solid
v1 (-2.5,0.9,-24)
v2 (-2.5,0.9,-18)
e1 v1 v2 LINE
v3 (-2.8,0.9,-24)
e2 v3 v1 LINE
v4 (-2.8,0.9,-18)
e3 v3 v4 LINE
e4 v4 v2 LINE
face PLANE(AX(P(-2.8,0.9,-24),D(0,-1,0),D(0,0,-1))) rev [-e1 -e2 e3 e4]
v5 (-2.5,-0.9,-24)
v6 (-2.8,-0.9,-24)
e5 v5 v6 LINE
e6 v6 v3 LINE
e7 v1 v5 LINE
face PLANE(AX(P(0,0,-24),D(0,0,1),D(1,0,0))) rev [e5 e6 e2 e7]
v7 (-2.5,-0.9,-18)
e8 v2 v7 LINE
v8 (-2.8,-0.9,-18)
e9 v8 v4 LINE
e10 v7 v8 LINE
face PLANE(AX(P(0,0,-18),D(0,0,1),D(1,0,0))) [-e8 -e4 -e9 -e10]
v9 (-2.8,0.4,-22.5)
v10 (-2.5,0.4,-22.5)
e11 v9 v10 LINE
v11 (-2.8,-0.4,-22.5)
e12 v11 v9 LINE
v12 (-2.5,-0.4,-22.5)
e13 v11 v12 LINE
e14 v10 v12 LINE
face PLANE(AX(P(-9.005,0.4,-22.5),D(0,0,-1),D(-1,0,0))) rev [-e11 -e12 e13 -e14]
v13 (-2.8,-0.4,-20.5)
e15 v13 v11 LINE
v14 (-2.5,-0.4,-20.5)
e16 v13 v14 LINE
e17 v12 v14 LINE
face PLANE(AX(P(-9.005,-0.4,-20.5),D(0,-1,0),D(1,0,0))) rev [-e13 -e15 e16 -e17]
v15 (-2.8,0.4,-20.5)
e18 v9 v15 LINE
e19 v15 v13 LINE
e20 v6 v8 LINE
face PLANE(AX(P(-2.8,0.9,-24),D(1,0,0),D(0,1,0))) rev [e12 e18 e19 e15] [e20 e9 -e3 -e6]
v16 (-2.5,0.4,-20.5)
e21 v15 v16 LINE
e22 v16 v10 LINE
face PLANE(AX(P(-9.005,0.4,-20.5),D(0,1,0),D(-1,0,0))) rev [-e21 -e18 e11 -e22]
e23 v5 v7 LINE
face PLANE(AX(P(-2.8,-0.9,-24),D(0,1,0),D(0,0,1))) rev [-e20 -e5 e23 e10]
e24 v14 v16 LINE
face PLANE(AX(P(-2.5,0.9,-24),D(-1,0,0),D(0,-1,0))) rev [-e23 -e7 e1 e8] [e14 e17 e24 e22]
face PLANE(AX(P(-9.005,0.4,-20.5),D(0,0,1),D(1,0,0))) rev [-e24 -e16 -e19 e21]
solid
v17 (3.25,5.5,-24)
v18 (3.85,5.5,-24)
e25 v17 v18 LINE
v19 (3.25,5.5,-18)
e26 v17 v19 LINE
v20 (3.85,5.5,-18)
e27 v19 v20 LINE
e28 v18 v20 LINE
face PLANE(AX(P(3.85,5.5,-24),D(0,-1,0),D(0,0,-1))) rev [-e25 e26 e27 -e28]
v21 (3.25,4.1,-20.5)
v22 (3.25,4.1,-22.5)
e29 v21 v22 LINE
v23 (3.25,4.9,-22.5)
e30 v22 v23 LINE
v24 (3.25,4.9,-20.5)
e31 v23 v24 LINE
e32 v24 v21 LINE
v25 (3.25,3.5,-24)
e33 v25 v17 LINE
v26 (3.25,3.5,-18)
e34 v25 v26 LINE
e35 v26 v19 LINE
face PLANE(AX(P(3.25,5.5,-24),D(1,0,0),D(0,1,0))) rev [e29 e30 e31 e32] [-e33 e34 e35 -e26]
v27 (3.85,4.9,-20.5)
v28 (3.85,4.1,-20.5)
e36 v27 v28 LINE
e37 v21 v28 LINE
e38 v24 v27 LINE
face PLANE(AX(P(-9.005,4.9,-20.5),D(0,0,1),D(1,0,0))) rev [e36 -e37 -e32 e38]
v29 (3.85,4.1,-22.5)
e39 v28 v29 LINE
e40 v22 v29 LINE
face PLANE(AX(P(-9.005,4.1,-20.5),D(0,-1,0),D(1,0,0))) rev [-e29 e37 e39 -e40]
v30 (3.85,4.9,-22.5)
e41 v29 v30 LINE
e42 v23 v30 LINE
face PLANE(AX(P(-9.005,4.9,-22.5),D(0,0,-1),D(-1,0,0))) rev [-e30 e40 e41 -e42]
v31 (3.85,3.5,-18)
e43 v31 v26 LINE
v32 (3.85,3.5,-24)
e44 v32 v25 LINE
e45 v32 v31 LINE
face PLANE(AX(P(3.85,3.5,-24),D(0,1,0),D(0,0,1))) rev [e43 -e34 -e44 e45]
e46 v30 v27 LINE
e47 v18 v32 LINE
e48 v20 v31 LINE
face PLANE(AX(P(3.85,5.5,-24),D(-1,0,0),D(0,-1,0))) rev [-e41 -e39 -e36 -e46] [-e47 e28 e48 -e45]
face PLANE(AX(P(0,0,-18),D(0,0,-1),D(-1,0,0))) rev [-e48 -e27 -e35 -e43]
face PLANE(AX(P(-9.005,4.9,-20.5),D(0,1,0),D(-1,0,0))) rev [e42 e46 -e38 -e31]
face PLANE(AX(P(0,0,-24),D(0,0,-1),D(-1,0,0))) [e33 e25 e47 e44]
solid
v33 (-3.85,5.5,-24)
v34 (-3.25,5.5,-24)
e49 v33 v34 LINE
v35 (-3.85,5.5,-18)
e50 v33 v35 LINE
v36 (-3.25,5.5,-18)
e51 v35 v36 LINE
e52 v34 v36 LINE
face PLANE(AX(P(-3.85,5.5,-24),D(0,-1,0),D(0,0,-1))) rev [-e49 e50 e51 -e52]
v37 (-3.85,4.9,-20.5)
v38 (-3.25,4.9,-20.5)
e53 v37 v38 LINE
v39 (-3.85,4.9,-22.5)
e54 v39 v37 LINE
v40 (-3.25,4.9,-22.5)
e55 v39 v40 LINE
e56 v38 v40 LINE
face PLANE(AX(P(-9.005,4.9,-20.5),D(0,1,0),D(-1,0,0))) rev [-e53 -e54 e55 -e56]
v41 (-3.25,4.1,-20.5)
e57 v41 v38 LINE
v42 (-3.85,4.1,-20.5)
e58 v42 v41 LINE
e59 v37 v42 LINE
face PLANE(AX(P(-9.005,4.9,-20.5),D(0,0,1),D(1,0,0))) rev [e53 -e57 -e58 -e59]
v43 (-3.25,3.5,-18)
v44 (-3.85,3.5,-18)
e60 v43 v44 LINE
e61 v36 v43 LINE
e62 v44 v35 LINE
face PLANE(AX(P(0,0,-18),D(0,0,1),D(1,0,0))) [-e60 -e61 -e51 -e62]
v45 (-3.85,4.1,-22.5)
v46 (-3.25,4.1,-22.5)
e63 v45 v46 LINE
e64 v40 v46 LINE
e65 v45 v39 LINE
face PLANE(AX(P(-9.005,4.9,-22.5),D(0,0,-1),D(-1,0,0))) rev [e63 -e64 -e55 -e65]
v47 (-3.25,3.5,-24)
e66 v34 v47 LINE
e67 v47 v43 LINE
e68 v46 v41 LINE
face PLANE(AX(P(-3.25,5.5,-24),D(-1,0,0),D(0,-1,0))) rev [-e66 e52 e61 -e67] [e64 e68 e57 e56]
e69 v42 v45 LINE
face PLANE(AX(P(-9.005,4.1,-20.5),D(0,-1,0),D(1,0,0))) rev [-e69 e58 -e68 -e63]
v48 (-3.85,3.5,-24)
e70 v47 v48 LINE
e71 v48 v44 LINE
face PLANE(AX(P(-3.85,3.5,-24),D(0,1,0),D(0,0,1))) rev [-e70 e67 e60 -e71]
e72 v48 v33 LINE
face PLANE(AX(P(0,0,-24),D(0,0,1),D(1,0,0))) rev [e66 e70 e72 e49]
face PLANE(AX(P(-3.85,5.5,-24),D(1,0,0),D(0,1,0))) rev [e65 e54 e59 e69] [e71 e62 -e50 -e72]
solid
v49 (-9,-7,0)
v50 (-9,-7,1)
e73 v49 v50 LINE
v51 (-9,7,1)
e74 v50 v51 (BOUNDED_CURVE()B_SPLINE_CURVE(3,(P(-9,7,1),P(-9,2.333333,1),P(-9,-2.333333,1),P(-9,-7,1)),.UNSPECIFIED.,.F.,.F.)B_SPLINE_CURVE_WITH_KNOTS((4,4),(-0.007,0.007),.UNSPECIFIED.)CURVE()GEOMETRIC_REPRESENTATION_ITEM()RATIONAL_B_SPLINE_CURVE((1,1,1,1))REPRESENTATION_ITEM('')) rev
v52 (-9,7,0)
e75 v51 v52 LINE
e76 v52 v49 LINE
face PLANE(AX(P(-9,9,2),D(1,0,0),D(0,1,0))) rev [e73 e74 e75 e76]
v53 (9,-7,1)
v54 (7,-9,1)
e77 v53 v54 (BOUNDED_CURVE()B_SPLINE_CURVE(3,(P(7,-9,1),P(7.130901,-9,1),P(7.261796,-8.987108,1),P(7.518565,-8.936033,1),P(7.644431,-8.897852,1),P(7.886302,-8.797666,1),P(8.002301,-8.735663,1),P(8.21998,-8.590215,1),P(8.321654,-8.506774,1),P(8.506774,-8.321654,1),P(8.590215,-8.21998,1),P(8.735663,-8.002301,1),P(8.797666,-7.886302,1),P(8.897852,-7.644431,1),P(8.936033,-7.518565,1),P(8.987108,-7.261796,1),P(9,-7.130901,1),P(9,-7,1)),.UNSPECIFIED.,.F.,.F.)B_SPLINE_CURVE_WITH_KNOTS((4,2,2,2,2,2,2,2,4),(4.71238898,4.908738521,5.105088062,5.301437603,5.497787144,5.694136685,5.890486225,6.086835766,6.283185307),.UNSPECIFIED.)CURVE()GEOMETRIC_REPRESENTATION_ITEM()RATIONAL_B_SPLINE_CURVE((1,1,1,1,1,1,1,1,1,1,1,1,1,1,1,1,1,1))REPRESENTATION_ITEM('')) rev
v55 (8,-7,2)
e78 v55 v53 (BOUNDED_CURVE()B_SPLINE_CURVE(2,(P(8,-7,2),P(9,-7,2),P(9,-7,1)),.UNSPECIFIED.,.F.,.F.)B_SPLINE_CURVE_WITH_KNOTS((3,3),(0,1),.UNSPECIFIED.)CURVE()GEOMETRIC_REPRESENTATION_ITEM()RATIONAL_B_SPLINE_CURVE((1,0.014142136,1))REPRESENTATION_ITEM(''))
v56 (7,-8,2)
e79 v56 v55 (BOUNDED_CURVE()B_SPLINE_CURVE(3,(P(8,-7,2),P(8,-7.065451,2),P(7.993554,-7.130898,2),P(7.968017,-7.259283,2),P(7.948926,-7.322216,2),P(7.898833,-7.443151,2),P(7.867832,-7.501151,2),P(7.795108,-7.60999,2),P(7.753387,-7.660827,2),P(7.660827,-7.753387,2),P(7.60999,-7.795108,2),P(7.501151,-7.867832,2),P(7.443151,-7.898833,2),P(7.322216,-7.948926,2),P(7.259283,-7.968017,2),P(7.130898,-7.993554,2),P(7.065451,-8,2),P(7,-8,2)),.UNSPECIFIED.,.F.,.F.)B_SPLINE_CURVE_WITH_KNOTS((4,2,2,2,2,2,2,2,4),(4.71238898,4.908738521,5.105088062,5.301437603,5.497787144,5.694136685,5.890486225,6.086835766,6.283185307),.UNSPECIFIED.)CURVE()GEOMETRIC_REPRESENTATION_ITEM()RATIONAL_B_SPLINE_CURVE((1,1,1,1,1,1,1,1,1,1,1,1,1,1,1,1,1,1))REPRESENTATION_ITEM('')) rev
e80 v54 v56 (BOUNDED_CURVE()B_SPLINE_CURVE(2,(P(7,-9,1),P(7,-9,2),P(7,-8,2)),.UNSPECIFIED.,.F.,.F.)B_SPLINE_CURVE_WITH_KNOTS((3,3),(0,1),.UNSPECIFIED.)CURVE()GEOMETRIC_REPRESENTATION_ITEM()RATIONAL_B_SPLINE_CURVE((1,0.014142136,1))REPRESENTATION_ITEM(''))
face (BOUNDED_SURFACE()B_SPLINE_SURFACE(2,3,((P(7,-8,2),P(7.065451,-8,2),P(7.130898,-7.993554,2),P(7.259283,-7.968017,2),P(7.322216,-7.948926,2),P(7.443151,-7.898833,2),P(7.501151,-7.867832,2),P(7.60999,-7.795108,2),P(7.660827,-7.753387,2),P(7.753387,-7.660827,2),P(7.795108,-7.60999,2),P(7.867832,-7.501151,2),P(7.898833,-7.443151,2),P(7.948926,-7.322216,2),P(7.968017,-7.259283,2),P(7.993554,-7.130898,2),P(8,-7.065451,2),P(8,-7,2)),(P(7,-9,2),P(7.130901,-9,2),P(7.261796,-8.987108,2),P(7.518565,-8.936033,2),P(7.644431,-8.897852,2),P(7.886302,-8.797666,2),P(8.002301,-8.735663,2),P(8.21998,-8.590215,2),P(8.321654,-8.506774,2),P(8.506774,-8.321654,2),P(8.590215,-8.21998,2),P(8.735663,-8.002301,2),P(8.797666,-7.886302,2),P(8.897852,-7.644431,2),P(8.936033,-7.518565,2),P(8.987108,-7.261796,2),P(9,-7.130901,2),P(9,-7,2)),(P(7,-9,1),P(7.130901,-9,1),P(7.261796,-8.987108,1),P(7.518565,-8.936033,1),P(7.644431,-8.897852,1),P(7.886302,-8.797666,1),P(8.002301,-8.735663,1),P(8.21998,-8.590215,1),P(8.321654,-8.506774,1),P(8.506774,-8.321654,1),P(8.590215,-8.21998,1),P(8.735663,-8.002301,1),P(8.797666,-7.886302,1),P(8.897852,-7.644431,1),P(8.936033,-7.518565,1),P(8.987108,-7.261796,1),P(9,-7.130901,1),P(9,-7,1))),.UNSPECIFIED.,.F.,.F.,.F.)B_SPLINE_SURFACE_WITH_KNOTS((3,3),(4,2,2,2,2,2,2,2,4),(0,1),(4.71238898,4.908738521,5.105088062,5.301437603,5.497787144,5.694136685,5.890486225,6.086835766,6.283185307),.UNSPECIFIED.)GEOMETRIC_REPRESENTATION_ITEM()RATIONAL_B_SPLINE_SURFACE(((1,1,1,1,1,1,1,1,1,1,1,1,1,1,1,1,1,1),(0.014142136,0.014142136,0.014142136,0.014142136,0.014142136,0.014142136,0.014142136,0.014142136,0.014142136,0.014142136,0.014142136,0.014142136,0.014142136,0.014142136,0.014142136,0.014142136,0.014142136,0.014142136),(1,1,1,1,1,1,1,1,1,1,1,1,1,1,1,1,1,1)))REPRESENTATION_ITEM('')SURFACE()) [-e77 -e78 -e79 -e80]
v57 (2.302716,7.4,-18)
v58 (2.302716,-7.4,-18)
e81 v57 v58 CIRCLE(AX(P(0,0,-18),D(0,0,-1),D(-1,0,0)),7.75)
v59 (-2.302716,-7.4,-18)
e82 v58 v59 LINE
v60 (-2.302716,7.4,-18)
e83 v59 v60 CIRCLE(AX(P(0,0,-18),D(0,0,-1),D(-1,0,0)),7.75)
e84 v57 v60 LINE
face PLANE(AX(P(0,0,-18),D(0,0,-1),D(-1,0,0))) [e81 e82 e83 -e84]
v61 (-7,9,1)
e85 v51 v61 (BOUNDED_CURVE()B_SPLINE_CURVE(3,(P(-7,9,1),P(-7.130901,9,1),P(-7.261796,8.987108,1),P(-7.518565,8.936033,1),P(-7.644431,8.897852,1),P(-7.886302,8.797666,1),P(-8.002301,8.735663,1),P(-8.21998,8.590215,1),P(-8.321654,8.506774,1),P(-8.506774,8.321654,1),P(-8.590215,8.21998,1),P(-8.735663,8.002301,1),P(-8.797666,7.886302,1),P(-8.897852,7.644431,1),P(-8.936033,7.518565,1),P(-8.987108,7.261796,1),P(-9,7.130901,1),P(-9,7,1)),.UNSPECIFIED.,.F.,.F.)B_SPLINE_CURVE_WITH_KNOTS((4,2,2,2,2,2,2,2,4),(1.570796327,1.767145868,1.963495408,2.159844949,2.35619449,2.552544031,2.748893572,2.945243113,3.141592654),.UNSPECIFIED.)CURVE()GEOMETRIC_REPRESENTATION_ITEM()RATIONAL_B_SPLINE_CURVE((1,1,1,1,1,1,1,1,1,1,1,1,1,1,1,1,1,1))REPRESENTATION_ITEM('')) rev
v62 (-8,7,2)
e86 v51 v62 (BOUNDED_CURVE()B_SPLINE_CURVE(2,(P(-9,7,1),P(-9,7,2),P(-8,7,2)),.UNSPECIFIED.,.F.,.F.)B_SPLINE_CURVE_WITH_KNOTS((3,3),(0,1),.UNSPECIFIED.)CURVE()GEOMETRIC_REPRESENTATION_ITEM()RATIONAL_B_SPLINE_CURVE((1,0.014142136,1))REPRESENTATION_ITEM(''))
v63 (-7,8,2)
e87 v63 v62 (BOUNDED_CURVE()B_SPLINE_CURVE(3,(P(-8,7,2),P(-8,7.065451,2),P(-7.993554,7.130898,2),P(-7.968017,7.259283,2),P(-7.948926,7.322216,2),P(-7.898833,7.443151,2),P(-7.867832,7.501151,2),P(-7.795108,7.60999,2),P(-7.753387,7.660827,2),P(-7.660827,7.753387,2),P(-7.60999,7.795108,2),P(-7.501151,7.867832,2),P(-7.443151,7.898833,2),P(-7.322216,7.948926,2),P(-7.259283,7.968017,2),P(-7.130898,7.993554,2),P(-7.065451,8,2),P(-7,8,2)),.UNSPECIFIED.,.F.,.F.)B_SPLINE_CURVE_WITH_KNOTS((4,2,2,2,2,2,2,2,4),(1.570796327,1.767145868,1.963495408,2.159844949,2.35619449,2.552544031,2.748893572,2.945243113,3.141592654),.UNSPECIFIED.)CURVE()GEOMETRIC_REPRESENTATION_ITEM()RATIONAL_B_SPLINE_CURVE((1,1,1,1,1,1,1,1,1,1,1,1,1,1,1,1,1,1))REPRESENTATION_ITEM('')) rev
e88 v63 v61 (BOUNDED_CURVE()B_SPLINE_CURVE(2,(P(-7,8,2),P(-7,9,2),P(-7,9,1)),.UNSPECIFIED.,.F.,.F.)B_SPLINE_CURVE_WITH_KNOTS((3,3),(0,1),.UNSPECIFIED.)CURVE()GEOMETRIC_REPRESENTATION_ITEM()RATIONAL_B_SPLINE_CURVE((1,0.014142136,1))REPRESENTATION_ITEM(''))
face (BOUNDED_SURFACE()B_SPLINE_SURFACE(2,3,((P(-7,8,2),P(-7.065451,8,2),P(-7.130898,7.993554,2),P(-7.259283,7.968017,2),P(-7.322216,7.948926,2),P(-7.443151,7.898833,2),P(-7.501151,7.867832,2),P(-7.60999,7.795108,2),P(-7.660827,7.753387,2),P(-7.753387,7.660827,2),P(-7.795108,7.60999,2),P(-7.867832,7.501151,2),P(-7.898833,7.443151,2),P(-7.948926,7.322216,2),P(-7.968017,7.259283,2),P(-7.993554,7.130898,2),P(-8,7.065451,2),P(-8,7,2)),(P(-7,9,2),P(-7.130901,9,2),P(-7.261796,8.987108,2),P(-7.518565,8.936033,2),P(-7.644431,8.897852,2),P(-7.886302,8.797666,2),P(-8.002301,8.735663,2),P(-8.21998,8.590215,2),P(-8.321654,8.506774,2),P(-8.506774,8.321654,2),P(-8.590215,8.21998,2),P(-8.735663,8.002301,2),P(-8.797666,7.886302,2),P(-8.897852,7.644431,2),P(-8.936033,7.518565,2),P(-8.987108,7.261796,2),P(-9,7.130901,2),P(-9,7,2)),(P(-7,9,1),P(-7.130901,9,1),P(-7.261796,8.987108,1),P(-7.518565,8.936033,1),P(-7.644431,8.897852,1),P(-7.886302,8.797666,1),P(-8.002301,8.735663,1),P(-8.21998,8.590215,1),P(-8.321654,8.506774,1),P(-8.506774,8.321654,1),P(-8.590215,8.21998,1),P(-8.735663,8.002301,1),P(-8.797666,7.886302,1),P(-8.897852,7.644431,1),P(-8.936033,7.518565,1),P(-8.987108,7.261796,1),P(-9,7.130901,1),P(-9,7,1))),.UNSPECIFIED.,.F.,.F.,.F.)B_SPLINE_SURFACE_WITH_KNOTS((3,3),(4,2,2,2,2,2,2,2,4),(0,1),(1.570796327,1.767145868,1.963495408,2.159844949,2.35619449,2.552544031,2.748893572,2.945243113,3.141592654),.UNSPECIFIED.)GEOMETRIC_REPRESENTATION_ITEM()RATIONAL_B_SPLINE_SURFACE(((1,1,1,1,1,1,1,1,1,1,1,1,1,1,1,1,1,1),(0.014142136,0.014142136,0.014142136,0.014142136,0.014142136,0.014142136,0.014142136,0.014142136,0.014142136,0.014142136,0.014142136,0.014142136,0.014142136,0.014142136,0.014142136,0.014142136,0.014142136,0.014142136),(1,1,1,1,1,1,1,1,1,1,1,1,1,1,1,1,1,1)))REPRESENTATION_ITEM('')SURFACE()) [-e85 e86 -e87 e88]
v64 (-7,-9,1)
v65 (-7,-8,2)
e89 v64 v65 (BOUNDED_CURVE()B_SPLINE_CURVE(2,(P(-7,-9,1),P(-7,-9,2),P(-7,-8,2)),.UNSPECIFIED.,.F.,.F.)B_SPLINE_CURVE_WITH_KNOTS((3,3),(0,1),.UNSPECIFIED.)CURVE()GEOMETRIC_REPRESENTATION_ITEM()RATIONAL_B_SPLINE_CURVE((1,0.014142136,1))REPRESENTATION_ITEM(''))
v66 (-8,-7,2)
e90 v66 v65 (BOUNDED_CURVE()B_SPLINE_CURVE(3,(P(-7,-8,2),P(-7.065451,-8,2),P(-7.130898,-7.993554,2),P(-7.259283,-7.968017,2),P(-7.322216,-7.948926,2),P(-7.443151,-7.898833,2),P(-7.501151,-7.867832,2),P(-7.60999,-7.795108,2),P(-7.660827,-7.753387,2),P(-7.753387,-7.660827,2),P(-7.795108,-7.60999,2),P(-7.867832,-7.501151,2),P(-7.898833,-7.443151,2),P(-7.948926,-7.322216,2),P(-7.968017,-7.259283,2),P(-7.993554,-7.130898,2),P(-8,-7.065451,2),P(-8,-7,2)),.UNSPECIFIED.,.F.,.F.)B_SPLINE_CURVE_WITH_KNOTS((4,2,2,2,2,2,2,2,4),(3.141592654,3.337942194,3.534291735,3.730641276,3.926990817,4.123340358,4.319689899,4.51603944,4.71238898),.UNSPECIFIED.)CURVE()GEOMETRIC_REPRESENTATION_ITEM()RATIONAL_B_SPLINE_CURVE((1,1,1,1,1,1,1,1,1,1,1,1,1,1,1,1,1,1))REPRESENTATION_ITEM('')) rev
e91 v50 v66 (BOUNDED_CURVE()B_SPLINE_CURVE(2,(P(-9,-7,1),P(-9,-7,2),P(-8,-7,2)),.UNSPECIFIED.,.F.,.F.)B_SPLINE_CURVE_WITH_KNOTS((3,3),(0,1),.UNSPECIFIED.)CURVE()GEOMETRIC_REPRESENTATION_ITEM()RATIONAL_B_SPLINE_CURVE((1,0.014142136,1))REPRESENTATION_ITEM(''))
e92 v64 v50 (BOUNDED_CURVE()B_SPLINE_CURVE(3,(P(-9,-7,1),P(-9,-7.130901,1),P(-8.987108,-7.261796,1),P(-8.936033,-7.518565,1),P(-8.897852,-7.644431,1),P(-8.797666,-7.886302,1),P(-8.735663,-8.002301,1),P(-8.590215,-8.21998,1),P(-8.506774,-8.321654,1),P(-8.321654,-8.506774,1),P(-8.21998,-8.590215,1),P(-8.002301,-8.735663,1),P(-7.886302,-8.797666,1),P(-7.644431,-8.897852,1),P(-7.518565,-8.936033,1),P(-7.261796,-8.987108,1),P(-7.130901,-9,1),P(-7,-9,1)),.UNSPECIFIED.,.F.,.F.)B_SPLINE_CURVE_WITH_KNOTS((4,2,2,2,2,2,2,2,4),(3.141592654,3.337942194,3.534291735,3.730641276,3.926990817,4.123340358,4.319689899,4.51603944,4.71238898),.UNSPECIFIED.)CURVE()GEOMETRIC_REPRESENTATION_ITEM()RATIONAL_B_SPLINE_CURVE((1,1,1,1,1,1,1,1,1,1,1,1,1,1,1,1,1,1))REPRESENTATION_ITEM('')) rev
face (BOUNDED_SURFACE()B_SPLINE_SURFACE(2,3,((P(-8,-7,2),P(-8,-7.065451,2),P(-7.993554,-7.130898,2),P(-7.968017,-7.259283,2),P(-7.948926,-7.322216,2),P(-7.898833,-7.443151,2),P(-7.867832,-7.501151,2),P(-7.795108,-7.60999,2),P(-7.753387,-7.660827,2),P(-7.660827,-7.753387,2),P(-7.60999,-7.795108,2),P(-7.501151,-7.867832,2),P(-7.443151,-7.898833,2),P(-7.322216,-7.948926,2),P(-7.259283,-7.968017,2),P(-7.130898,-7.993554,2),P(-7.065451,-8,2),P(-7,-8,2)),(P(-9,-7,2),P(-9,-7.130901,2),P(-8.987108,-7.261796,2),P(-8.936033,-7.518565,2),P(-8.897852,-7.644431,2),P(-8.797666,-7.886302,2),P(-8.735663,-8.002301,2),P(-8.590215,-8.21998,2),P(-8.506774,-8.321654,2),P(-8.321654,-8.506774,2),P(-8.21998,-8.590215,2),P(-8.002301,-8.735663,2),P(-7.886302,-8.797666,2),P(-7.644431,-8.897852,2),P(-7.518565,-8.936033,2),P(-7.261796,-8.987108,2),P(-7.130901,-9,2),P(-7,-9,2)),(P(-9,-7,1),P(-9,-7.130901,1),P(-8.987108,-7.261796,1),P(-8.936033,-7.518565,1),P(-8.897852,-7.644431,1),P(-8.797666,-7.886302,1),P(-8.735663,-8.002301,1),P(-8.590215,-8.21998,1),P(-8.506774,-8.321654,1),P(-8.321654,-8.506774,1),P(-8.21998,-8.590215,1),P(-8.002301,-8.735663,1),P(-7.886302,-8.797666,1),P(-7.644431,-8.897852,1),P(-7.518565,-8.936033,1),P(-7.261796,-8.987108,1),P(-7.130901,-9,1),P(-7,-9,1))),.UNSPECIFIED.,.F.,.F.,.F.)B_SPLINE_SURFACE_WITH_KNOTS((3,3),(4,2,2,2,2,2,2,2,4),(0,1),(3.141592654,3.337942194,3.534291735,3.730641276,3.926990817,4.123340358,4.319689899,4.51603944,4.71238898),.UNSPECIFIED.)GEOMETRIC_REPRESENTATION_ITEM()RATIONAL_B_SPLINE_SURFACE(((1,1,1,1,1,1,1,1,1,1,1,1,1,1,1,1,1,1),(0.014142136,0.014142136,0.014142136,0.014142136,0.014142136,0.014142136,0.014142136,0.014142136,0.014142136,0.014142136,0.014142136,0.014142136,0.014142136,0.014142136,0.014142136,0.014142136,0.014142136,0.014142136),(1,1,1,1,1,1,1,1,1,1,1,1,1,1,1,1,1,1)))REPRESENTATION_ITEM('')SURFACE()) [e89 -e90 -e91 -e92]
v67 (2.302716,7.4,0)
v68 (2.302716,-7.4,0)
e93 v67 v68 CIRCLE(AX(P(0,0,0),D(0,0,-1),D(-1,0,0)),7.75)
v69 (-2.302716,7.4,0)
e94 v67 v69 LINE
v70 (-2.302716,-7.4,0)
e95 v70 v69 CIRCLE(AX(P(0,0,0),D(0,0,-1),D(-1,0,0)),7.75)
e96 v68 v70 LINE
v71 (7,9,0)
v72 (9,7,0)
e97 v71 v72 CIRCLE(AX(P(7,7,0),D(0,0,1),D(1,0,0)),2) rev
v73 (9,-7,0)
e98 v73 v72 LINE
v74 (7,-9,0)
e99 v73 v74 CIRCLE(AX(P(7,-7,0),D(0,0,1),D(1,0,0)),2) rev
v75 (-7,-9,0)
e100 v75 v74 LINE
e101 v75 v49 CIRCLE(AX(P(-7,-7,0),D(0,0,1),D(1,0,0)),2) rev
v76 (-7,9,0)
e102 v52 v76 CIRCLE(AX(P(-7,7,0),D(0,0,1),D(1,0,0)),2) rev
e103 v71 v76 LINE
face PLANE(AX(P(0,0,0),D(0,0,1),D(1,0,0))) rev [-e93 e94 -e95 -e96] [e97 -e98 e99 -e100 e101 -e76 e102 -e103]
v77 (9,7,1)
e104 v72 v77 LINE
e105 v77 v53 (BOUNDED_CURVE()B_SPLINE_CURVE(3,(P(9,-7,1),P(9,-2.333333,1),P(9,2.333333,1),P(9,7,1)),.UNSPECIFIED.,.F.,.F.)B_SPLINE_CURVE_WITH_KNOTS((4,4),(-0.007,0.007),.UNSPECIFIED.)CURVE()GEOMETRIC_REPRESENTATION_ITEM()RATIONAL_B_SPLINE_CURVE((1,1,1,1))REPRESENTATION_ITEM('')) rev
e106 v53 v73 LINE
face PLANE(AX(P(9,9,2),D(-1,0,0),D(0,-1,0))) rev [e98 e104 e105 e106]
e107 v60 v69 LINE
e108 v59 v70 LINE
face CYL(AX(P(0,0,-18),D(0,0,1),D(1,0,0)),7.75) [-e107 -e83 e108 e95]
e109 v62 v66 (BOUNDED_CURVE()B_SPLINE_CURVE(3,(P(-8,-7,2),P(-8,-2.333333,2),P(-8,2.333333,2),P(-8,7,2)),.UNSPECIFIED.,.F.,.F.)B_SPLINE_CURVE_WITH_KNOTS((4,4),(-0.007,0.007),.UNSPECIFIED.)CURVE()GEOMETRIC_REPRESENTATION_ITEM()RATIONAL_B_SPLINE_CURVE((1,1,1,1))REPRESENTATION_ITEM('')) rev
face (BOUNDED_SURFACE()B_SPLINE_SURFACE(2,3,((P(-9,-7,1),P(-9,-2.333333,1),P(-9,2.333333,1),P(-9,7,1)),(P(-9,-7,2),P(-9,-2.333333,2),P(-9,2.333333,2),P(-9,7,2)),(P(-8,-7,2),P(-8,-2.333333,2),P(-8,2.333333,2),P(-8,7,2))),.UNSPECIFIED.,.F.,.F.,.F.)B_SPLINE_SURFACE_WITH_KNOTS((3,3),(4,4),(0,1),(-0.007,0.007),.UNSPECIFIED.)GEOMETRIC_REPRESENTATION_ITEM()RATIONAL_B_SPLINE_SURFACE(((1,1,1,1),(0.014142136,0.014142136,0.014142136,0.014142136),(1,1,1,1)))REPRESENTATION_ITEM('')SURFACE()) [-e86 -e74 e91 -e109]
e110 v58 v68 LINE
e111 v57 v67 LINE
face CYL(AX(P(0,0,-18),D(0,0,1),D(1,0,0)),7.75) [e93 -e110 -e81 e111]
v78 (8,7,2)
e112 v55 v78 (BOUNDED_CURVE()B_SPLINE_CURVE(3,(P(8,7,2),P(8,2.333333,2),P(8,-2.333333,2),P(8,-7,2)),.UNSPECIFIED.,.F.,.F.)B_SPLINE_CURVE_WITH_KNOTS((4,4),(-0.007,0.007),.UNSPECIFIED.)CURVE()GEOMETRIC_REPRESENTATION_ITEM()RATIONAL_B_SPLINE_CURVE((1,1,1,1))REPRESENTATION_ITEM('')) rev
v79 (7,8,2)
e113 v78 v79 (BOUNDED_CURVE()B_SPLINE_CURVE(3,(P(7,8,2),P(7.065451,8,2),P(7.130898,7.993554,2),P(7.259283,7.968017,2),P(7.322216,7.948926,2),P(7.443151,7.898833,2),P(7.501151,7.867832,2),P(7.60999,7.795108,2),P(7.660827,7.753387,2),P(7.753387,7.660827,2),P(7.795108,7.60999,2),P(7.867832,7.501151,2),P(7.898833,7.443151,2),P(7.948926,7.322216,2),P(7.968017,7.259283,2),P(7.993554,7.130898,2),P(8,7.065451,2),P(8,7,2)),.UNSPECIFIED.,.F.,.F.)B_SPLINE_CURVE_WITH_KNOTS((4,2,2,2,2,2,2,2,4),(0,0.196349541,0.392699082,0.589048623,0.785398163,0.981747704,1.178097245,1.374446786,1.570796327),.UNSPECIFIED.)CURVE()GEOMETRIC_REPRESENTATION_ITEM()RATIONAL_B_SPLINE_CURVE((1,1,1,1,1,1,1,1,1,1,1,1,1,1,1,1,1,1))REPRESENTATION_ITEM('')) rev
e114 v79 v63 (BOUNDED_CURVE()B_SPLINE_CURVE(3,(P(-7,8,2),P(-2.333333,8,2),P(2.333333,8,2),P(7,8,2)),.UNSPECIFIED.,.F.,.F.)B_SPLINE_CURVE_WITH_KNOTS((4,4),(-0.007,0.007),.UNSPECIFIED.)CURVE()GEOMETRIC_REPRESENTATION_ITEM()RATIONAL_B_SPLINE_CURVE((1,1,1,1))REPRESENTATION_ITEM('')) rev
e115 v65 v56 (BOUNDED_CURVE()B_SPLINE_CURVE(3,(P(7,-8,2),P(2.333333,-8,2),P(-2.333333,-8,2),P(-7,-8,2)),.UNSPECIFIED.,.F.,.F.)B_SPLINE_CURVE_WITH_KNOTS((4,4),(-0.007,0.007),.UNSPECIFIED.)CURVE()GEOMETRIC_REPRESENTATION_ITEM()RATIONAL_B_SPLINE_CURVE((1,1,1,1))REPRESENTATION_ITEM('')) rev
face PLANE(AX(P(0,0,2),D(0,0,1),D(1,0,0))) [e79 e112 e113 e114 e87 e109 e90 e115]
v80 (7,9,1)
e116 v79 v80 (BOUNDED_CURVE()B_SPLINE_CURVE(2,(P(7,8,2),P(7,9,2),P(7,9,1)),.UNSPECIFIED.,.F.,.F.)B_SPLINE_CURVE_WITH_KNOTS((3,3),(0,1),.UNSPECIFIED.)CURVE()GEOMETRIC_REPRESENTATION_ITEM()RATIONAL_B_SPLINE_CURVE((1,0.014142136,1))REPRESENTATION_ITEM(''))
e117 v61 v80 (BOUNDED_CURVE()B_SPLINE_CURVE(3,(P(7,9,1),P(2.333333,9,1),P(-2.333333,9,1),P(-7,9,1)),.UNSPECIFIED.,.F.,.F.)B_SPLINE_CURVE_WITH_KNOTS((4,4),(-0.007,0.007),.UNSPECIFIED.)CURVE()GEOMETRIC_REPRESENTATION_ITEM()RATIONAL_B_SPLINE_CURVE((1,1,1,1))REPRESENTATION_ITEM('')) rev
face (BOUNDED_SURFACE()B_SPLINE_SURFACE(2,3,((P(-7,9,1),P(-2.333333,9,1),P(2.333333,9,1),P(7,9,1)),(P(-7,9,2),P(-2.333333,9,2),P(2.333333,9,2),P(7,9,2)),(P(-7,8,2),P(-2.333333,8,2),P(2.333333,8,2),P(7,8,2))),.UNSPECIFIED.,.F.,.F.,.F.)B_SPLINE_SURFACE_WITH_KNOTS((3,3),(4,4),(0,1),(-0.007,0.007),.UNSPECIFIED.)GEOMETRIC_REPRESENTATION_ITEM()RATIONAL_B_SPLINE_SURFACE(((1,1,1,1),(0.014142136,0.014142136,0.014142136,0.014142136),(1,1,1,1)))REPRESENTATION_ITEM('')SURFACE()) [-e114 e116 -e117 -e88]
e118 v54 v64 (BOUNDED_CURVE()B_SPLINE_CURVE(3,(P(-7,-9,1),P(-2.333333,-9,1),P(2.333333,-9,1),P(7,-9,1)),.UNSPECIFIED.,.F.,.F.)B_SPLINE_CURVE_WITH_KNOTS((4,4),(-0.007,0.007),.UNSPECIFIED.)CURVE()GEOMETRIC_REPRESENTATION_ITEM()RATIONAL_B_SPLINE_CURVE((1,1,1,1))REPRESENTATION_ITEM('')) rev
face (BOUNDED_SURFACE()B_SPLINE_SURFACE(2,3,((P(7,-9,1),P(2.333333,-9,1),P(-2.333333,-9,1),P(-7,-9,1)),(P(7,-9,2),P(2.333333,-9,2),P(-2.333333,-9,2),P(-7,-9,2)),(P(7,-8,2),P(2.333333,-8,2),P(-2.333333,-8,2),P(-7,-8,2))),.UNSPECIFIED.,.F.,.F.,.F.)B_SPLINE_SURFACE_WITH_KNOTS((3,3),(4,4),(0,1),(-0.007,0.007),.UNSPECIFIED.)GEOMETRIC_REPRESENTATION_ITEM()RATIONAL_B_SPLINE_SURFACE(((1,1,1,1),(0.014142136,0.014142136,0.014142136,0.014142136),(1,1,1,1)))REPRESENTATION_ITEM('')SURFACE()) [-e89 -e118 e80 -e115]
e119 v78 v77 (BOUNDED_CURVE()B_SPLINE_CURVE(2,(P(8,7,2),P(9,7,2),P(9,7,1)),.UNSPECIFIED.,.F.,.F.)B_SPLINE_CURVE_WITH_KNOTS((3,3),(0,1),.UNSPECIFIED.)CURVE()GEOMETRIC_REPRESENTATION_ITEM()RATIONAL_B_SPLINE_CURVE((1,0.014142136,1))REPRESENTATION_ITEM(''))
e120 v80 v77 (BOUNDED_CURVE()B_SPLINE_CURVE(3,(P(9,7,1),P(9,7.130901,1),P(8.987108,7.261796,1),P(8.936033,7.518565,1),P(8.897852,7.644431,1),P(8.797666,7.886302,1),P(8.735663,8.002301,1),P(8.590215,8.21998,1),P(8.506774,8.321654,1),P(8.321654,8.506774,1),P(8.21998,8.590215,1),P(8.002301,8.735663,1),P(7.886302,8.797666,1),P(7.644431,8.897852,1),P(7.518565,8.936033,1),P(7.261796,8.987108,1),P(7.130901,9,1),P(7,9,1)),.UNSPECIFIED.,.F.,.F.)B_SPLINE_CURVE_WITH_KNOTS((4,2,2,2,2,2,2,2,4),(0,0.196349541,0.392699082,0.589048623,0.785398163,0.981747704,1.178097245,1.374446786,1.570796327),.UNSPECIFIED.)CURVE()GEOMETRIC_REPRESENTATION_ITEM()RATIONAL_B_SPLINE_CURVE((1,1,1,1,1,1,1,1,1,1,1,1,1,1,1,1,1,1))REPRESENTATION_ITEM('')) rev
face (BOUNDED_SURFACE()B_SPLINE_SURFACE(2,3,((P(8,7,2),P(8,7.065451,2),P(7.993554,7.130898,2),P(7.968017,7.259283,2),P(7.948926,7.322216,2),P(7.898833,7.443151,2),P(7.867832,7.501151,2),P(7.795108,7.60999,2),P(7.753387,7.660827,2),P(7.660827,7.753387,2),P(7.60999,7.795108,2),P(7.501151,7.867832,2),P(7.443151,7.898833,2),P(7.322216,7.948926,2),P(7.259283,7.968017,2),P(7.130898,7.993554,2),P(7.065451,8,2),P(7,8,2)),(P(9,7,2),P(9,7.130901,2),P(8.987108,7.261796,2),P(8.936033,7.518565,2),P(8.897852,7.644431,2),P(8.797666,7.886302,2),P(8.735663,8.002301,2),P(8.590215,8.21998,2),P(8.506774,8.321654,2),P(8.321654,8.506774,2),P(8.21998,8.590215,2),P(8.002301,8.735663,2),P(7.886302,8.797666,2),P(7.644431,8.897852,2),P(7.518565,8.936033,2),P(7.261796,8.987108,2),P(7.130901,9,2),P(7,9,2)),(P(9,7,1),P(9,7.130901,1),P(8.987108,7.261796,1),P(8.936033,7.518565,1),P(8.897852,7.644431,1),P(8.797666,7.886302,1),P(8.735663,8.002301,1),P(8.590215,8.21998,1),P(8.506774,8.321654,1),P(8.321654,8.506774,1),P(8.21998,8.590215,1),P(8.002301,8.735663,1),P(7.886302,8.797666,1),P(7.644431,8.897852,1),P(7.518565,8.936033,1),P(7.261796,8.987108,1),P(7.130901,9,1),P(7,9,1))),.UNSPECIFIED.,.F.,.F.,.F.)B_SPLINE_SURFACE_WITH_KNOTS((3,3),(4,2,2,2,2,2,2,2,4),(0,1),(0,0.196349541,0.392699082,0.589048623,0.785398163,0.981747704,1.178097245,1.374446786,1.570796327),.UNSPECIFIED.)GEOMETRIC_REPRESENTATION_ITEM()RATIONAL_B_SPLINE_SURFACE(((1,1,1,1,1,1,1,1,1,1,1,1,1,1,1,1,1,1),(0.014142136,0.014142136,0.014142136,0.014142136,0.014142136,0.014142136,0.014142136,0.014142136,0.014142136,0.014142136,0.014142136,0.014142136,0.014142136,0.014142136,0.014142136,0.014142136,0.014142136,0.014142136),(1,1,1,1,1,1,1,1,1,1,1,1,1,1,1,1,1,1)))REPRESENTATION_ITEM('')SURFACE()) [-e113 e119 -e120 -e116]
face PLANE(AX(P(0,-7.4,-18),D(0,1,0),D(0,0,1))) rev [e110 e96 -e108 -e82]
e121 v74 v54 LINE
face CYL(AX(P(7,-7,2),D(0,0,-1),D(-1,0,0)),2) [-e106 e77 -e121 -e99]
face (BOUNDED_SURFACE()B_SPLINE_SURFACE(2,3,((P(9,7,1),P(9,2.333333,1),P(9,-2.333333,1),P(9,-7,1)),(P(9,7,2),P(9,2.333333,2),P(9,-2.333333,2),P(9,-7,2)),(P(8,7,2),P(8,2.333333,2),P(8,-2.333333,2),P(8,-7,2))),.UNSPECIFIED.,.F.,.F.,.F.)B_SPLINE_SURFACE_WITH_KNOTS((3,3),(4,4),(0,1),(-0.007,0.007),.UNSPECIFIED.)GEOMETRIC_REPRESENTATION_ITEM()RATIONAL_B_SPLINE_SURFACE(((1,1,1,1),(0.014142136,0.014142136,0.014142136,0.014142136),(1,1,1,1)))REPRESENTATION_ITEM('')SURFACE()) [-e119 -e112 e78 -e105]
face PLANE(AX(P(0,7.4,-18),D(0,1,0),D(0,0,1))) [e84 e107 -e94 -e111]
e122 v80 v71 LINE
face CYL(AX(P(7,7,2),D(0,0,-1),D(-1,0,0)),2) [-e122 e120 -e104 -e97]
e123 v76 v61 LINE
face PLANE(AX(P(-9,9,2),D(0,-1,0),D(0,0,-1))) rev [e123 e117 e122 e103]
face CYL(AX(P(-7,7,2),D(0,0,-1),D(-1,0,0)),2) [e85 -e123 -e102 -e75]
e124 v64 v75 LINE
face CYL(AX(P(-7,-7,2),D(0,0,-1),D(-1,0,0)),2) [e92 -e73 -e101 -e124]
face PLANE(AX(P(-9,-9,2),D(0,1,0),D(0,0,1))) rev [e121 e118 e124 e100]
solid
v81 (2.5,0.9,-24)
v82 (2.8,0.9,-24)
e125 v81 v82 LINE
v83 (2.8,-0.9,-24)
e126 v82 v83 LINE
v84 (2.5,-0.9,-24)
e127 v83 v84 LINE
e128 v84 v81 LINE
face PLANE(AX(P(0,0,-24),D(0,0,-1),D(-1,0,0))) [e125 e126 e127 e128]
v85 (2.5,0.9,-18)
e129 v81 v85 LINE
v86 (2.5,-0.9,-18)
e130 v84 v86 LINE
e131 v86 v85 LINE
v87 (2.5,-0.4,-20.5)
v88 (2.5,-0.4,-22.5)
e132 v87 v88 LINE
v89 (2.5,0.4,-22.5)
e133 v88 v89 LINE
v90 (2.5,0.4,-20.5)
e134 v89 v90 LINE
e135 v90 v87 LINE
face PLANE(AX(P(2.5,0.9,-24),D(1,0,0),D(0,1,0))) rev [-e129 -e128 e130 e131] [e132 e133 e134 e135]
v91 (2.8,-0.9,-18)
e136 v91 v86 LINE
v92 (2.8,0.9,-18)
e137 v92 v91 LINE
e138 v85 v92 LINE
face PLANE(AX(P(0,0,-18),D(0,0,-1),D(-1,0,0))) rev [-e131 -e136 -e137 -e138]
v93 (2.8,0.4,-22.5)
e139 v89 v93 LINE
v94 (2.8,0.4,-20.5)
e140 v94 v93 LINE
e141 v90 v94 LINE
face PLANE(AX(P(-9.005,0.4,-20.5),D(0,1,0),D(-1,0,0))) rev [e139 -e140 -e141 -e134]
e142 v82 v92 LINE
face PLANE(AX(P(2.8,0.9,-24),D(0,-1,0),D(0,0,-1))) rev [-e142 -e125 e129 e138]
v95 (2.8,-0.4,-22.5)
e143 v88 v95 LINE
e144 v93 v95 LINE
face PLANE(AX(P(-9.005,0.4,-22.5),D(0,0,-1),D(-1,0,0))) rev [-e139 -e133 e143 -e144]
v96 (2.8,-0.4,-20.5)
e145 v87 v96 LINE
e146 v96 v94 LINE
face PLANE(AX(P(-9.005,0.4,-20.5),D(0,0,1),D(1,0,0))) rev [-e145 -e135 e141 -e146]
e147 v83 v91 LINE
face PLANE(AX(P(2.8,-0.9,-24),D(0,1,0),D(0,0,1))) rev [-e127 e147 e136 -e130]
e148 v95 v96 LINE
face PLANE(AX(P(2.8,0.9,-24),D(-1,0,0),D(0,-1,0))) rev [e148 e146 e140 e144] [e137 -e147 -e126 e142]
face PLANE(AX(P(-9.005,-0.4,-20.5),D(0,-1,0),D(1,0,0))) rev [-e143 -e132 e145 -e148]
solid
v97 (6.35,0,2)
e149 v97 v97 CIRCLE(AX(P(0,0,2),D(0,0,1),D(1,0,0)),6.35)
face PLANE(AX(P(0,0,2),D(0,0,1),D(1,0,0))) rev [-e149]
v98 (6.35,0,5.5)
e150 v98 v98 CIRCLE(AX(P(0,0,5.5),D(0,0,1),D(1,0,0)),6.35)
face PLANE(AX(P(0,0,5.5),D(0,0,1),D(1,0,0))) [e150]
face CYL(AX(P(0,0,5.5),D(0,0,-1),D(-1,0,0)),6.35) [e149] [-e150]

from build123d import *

# Parameters (mm, degrees)
SKETCH1_W             = 18
SKETCH1_H             = 18
BOSS_EXTRUDE1_DEPTH   = 2
FILLET1_R             = 2
FILLET2_SIZE          = 1
SKETCH2_R             = 6.35
BOSS_EXTRUDE2_DEPTH   = 3.5
BOSS_EXTRUDE3_DEPTH   = 18
SKETCH4_W             = 0.6
SKETCH4_H             = 2
BOSS_EXTRUDE4_DEPTH   = 6
SKETCH4_W_2           = 0.3
SKETCH4_H_2           = 1.8
BOSS_EXTRUDE4_2_DEPTH = 6
BOSS_EXTRUDE4_3_DEPTH = 6
BOSS_EXTRUDE4_4_DEPTH = 6
SKETCH5_W             = 2
SKETCH5_H             = 0.8
CUT_EXTRUDE1_DEPTH    = 29.672678709


with BuildPart() as part:
    # Sketch1 → Boss-Extrude1 (new body)
    with BuildSketch(Plane.XY):
        Rectangle(SKETCH1_W, SKETCH1_H)
    extrude(amount=BOSS_EXTRUDE1_DEPTH)

    # Fillet1
    fillet1_edges = [part.edges().sort_by_distance(p)[0] for p in [
        (9, -9, 1),
        (-9, -9, 1),
        (-9, 9, 1),
        (9, 9, 1),
    ]]
    fillet(fillet1_edges, radius=FILLET1_R)

    # Fillet2
    # a fillet whose section is not a circle: 1 mm, written as the material it takes off along each edge
    with BuildSketch(Plane(origin=(-7, 7, 2), x_dir=(0, 1, 0), z_dir=(1, 0, 0))) as fillet2_piece_1:
        with BuildLine():
            Bezier((2, -FILLET2_SIZE), (2, 0), (2 - FILLET2_SIZE, 0), weights=[1, 0.014142136, 1])
            Line((2 - FILLET2_SIZE, 0), (2, 0))
            Line((2, 0), (2, -FILLET2_SIZE))
        make_face()
    revolve(axis=Axis((-7, 7, 2), (0, 0, 1)), revolution_arc=90, mode=Mode.SUBTRACT)
    with BuildSketch(Plane(origin=(-7, 9, 2), x_dir=(0, 0, -1), z_dir=(1, 0, 0))) as fillet2_piece_2:
        with BuildLine():
            Bezier((FILLET2_SIZE, 0), (0, 0), (0, -FILLET2_SIZE), weights=[1, 0.014142136, 1])
            Line((0, -FILLET2_SIZE), (0, 0))
            Line((0, 0), (FILLET2_SIZE, 0))
        make_face()
    extrude(amount=14, mode=Mode.SUBTRACT)
    with BuildSketch(Plane(origin=(7, 7, 2), x_dir=(0, 1, 0), z_dir=(-1, 0, 0))) as fillet2_piece_3:
        with BuildLine():
            Bezier((2, FILLET2_SIZE), (2, 0), (2 - FILLET2_SIZE, 0), weights=[1, 0.014142136, 1])
            Line((2 - FILLET2_SIZE, 0), (2, 0))
            Line((2, 0), (2, FILLET2_SIZE))
        make_face()
    revolve(axis=Axis((7, 7, 2), (0, 0, -1)), revolution_arc=90, mode=Mode.SUBTRACT)
    with BuildSketch(Plane(origin=(9, 7, 2), x_dir=(-1, 0, 0), z_dir=(0, -1, 0)), Plane(origin=(7, -9, 2), x_dir=(0, 1, 0), z_dir=(-1, 0, 0)), Plane(origin=(-9, -7, 2), x_dir=(1, 0, 0), z_dir=(0, 1, 0))) as fillet2_piece_4:
        with BuildLine():
            Bezier((FILLET2_SIZE, 0), (0, 0), (0, FILLET2_SIZE), weights=[1, 0.014142136, 1])
            Line((0, FILLET2_SIZE), (0, 0))
            Line((0, 0), (FILLET2_SIZE, 0))
        make_face()
    extrude(amount=14, mode=Mode.SUBTRACT)
    with BuildSketch(Plane(origin=(7, -7, 2), x_dir=(1, 0, 0), z_dir=(0, 1, 0))) as fillet2_piece_5:
        with BuildLine():
            Bezier((2 - FILLET2_SIZE, 0), (2, 0), (2, FILLET2_SIZE), weights=[1, 0.014142136, 1])
            Line((2, FILLET2_SIZE), (2, 0))
            Line((2, 0), (2 - FILLET2_SIZE, 0))
        make_face()
    revolve(axis=Axis((7, -7, 2), (0, 0, -1)), revolution_arc=90, mode=Mode.SUBTRACT)
    with BuildSketch(Plane(origin=(-7, -7, 2), x_dir=(0, -1, 0), z_dir=(1, 0, 0))) as fillet2_piece_6:
        with BuildLine():
            Bezier((2 - FILLET2_SIZE, 0), (2, 0), (2, FILLET2_SIZE), weights=[1, 0.014142136, 1])
            Line((2, FILLET2_SIZE), (2, 0))
            Line((2, 0), (2 - FILLET2_SIZE, 0))
        make_face()
    revolve(axis=Axis((-7, -7, 2), (0, 0, -1)), revolution_arc=90, mode=Mode.SUBTRACT)

    # Sketch3 → Boss-Extrude3 (add)
    with BuildSketch(Plane(origin=(0, 0, 0), x_dir=(-1, 0, 0), z_dir=(0, 0, -1))):
        with BuildLine():
            ThreePointArc((-2.302715788, 7.4), (-6.241335889, 4.59436898), (-7.75, 0))
            Line((-7.75, 0), (7.75, 0))
            ThreePointArc((7.75, 0), (6.241335889, 4.59436898), (2.302715788, 7.4))
            Line((2.302715788, 7.4), (-2.302715788, 7.4))
        make_face()
        with BuildLine():
            Line((7.75, 0), (-7.75, 0))
            ThreePointArc((-7.75, 0), (-6.241335889, -4.59436898), (-2.302715788, -7.4))
            Line((-2.302715788, -7.4), (2.302715788, -7.4))
            ThreePointArc((2.302715788, -7.4), (6.241335889, -4.59436898), (7.75, 0))
        make_face()
    extrude(amount=BOSS_EXTRUDE3_DEPTH)


with BuildPart() as body_2:
    # Sketch2 → Boss-Extrude2 (new body)
    with BuildSketch(Plane.XY.offset(2)):
        Circle(SKETCH2_R)
    extrude(amount=BOSS_EXTRUDE2_DEPTH)


with BuildPart() as body_3:
    # Sketch4 → Boss-Extrude4 (new body)
    with BuildSketch(Plane(origin=(0, 0, -18), x_dir=(-1, 0, 0), z_dir=(0, 0, -1))):
        with Locations((-3.55, 4.5)):
            Rectangle(SKETCH4_W, SKETCH4_H)
    extrude(amount=BOSS_EXTRUDE4_DEPTH)


with BuildPart() as body_4:
    # Sketch4 → Boss-Extrude4 2 (new body)
    with BuildSketch(Plane(origin=(0, 0, -18), x_dir=(-1, 0, 0), z_dir=(0, 0, -1))):
        with Locations((-2.65, 0)):
            Rectangle(SKETCH4_W_2, SKETCH4_H_2)
    extrude(amount=BOSS_EXTRUDE4_2_DEPTH)


with BuildPart() as body_5:
    # Sketch4 → Boss-Extrude4 3 (new body)
    with BuildSketch(Plane(origin=(0, 0, -18), x_dir=(-1, 0, 0), z_dir=(0, 0, -1))):
        with Locations((2.65, 0)):
            Rectangle(SKETCH4_W_2, SKETCH4_H_2)
    extrude(amount=BOSS_EXTRUDE4_3_DEPTH)


with BuildPart() as body_6:
    # Sketch4 → Boss-Extrude4 4 (new body)
    with BuildSketch(Plane(origin=(0, 0, -18), x_dir=(-1, 0, 0), z_dir=(0, 0, -1))):
        with Locations((3.55, 4.5)):
            Rectangle(SKETCH4_W, SKETCH4_H)
    extrude(amount=BOSS_EXTRUDE4_4_DEPTH)


with BuildPart() as cut_extrude1_tool:
    # Sketch5 → Cut-Extrude1 (new, through all)
    with BuildSketch(Plane(origin=(3.85, 0, 0), x_dir=(0, 0, -1), z_dir=(1, 0, 0))):
        with Locations((21.5, 4.5)):
            Rectangle(SKETCH5_W, SKETCH5_H)
        with Locations((21.5, 0)):
            Rectangle(SKETCH5_W, SKETCH5_H)
    extrude(amount=-CUT_EXTRUDE1_DEPTH)


with BuildPart() as body_3_1:
    add(body_3.part)

    # Cut-Extrude1: cut by cut_extrude1_tool
    add(cut_extrude1_tool.part, mode=Mode.SUBTRACT)


with BuildPart() as body_4_1:
    add(body_4.part)

    # Cut-Extrude1: cut by cut_extrude1_tool
    add(cut_extrude1_tool.part, mode=Mode.SUBTRACT)


with BuildPart() as body_5_1:
    add(body_5.part)

    # Cut-Extrude1: cut by cut_extrude1_tool
    add(cut_extrude1_tool.part, mode=Mode.SUBTRACT)


with BuildPart() as body_6_1:
    add(body_6.part)

    # Cut-Extrude1: cut by cut_extrude1_tool
    add(cut_extrude1_tool.part, mode=Mode.SUBTRACT)


solid = Compound([part.part, body_2.part, body_3_1.part, body_4_1.part, body_5_1.part, body_6_1.part])
